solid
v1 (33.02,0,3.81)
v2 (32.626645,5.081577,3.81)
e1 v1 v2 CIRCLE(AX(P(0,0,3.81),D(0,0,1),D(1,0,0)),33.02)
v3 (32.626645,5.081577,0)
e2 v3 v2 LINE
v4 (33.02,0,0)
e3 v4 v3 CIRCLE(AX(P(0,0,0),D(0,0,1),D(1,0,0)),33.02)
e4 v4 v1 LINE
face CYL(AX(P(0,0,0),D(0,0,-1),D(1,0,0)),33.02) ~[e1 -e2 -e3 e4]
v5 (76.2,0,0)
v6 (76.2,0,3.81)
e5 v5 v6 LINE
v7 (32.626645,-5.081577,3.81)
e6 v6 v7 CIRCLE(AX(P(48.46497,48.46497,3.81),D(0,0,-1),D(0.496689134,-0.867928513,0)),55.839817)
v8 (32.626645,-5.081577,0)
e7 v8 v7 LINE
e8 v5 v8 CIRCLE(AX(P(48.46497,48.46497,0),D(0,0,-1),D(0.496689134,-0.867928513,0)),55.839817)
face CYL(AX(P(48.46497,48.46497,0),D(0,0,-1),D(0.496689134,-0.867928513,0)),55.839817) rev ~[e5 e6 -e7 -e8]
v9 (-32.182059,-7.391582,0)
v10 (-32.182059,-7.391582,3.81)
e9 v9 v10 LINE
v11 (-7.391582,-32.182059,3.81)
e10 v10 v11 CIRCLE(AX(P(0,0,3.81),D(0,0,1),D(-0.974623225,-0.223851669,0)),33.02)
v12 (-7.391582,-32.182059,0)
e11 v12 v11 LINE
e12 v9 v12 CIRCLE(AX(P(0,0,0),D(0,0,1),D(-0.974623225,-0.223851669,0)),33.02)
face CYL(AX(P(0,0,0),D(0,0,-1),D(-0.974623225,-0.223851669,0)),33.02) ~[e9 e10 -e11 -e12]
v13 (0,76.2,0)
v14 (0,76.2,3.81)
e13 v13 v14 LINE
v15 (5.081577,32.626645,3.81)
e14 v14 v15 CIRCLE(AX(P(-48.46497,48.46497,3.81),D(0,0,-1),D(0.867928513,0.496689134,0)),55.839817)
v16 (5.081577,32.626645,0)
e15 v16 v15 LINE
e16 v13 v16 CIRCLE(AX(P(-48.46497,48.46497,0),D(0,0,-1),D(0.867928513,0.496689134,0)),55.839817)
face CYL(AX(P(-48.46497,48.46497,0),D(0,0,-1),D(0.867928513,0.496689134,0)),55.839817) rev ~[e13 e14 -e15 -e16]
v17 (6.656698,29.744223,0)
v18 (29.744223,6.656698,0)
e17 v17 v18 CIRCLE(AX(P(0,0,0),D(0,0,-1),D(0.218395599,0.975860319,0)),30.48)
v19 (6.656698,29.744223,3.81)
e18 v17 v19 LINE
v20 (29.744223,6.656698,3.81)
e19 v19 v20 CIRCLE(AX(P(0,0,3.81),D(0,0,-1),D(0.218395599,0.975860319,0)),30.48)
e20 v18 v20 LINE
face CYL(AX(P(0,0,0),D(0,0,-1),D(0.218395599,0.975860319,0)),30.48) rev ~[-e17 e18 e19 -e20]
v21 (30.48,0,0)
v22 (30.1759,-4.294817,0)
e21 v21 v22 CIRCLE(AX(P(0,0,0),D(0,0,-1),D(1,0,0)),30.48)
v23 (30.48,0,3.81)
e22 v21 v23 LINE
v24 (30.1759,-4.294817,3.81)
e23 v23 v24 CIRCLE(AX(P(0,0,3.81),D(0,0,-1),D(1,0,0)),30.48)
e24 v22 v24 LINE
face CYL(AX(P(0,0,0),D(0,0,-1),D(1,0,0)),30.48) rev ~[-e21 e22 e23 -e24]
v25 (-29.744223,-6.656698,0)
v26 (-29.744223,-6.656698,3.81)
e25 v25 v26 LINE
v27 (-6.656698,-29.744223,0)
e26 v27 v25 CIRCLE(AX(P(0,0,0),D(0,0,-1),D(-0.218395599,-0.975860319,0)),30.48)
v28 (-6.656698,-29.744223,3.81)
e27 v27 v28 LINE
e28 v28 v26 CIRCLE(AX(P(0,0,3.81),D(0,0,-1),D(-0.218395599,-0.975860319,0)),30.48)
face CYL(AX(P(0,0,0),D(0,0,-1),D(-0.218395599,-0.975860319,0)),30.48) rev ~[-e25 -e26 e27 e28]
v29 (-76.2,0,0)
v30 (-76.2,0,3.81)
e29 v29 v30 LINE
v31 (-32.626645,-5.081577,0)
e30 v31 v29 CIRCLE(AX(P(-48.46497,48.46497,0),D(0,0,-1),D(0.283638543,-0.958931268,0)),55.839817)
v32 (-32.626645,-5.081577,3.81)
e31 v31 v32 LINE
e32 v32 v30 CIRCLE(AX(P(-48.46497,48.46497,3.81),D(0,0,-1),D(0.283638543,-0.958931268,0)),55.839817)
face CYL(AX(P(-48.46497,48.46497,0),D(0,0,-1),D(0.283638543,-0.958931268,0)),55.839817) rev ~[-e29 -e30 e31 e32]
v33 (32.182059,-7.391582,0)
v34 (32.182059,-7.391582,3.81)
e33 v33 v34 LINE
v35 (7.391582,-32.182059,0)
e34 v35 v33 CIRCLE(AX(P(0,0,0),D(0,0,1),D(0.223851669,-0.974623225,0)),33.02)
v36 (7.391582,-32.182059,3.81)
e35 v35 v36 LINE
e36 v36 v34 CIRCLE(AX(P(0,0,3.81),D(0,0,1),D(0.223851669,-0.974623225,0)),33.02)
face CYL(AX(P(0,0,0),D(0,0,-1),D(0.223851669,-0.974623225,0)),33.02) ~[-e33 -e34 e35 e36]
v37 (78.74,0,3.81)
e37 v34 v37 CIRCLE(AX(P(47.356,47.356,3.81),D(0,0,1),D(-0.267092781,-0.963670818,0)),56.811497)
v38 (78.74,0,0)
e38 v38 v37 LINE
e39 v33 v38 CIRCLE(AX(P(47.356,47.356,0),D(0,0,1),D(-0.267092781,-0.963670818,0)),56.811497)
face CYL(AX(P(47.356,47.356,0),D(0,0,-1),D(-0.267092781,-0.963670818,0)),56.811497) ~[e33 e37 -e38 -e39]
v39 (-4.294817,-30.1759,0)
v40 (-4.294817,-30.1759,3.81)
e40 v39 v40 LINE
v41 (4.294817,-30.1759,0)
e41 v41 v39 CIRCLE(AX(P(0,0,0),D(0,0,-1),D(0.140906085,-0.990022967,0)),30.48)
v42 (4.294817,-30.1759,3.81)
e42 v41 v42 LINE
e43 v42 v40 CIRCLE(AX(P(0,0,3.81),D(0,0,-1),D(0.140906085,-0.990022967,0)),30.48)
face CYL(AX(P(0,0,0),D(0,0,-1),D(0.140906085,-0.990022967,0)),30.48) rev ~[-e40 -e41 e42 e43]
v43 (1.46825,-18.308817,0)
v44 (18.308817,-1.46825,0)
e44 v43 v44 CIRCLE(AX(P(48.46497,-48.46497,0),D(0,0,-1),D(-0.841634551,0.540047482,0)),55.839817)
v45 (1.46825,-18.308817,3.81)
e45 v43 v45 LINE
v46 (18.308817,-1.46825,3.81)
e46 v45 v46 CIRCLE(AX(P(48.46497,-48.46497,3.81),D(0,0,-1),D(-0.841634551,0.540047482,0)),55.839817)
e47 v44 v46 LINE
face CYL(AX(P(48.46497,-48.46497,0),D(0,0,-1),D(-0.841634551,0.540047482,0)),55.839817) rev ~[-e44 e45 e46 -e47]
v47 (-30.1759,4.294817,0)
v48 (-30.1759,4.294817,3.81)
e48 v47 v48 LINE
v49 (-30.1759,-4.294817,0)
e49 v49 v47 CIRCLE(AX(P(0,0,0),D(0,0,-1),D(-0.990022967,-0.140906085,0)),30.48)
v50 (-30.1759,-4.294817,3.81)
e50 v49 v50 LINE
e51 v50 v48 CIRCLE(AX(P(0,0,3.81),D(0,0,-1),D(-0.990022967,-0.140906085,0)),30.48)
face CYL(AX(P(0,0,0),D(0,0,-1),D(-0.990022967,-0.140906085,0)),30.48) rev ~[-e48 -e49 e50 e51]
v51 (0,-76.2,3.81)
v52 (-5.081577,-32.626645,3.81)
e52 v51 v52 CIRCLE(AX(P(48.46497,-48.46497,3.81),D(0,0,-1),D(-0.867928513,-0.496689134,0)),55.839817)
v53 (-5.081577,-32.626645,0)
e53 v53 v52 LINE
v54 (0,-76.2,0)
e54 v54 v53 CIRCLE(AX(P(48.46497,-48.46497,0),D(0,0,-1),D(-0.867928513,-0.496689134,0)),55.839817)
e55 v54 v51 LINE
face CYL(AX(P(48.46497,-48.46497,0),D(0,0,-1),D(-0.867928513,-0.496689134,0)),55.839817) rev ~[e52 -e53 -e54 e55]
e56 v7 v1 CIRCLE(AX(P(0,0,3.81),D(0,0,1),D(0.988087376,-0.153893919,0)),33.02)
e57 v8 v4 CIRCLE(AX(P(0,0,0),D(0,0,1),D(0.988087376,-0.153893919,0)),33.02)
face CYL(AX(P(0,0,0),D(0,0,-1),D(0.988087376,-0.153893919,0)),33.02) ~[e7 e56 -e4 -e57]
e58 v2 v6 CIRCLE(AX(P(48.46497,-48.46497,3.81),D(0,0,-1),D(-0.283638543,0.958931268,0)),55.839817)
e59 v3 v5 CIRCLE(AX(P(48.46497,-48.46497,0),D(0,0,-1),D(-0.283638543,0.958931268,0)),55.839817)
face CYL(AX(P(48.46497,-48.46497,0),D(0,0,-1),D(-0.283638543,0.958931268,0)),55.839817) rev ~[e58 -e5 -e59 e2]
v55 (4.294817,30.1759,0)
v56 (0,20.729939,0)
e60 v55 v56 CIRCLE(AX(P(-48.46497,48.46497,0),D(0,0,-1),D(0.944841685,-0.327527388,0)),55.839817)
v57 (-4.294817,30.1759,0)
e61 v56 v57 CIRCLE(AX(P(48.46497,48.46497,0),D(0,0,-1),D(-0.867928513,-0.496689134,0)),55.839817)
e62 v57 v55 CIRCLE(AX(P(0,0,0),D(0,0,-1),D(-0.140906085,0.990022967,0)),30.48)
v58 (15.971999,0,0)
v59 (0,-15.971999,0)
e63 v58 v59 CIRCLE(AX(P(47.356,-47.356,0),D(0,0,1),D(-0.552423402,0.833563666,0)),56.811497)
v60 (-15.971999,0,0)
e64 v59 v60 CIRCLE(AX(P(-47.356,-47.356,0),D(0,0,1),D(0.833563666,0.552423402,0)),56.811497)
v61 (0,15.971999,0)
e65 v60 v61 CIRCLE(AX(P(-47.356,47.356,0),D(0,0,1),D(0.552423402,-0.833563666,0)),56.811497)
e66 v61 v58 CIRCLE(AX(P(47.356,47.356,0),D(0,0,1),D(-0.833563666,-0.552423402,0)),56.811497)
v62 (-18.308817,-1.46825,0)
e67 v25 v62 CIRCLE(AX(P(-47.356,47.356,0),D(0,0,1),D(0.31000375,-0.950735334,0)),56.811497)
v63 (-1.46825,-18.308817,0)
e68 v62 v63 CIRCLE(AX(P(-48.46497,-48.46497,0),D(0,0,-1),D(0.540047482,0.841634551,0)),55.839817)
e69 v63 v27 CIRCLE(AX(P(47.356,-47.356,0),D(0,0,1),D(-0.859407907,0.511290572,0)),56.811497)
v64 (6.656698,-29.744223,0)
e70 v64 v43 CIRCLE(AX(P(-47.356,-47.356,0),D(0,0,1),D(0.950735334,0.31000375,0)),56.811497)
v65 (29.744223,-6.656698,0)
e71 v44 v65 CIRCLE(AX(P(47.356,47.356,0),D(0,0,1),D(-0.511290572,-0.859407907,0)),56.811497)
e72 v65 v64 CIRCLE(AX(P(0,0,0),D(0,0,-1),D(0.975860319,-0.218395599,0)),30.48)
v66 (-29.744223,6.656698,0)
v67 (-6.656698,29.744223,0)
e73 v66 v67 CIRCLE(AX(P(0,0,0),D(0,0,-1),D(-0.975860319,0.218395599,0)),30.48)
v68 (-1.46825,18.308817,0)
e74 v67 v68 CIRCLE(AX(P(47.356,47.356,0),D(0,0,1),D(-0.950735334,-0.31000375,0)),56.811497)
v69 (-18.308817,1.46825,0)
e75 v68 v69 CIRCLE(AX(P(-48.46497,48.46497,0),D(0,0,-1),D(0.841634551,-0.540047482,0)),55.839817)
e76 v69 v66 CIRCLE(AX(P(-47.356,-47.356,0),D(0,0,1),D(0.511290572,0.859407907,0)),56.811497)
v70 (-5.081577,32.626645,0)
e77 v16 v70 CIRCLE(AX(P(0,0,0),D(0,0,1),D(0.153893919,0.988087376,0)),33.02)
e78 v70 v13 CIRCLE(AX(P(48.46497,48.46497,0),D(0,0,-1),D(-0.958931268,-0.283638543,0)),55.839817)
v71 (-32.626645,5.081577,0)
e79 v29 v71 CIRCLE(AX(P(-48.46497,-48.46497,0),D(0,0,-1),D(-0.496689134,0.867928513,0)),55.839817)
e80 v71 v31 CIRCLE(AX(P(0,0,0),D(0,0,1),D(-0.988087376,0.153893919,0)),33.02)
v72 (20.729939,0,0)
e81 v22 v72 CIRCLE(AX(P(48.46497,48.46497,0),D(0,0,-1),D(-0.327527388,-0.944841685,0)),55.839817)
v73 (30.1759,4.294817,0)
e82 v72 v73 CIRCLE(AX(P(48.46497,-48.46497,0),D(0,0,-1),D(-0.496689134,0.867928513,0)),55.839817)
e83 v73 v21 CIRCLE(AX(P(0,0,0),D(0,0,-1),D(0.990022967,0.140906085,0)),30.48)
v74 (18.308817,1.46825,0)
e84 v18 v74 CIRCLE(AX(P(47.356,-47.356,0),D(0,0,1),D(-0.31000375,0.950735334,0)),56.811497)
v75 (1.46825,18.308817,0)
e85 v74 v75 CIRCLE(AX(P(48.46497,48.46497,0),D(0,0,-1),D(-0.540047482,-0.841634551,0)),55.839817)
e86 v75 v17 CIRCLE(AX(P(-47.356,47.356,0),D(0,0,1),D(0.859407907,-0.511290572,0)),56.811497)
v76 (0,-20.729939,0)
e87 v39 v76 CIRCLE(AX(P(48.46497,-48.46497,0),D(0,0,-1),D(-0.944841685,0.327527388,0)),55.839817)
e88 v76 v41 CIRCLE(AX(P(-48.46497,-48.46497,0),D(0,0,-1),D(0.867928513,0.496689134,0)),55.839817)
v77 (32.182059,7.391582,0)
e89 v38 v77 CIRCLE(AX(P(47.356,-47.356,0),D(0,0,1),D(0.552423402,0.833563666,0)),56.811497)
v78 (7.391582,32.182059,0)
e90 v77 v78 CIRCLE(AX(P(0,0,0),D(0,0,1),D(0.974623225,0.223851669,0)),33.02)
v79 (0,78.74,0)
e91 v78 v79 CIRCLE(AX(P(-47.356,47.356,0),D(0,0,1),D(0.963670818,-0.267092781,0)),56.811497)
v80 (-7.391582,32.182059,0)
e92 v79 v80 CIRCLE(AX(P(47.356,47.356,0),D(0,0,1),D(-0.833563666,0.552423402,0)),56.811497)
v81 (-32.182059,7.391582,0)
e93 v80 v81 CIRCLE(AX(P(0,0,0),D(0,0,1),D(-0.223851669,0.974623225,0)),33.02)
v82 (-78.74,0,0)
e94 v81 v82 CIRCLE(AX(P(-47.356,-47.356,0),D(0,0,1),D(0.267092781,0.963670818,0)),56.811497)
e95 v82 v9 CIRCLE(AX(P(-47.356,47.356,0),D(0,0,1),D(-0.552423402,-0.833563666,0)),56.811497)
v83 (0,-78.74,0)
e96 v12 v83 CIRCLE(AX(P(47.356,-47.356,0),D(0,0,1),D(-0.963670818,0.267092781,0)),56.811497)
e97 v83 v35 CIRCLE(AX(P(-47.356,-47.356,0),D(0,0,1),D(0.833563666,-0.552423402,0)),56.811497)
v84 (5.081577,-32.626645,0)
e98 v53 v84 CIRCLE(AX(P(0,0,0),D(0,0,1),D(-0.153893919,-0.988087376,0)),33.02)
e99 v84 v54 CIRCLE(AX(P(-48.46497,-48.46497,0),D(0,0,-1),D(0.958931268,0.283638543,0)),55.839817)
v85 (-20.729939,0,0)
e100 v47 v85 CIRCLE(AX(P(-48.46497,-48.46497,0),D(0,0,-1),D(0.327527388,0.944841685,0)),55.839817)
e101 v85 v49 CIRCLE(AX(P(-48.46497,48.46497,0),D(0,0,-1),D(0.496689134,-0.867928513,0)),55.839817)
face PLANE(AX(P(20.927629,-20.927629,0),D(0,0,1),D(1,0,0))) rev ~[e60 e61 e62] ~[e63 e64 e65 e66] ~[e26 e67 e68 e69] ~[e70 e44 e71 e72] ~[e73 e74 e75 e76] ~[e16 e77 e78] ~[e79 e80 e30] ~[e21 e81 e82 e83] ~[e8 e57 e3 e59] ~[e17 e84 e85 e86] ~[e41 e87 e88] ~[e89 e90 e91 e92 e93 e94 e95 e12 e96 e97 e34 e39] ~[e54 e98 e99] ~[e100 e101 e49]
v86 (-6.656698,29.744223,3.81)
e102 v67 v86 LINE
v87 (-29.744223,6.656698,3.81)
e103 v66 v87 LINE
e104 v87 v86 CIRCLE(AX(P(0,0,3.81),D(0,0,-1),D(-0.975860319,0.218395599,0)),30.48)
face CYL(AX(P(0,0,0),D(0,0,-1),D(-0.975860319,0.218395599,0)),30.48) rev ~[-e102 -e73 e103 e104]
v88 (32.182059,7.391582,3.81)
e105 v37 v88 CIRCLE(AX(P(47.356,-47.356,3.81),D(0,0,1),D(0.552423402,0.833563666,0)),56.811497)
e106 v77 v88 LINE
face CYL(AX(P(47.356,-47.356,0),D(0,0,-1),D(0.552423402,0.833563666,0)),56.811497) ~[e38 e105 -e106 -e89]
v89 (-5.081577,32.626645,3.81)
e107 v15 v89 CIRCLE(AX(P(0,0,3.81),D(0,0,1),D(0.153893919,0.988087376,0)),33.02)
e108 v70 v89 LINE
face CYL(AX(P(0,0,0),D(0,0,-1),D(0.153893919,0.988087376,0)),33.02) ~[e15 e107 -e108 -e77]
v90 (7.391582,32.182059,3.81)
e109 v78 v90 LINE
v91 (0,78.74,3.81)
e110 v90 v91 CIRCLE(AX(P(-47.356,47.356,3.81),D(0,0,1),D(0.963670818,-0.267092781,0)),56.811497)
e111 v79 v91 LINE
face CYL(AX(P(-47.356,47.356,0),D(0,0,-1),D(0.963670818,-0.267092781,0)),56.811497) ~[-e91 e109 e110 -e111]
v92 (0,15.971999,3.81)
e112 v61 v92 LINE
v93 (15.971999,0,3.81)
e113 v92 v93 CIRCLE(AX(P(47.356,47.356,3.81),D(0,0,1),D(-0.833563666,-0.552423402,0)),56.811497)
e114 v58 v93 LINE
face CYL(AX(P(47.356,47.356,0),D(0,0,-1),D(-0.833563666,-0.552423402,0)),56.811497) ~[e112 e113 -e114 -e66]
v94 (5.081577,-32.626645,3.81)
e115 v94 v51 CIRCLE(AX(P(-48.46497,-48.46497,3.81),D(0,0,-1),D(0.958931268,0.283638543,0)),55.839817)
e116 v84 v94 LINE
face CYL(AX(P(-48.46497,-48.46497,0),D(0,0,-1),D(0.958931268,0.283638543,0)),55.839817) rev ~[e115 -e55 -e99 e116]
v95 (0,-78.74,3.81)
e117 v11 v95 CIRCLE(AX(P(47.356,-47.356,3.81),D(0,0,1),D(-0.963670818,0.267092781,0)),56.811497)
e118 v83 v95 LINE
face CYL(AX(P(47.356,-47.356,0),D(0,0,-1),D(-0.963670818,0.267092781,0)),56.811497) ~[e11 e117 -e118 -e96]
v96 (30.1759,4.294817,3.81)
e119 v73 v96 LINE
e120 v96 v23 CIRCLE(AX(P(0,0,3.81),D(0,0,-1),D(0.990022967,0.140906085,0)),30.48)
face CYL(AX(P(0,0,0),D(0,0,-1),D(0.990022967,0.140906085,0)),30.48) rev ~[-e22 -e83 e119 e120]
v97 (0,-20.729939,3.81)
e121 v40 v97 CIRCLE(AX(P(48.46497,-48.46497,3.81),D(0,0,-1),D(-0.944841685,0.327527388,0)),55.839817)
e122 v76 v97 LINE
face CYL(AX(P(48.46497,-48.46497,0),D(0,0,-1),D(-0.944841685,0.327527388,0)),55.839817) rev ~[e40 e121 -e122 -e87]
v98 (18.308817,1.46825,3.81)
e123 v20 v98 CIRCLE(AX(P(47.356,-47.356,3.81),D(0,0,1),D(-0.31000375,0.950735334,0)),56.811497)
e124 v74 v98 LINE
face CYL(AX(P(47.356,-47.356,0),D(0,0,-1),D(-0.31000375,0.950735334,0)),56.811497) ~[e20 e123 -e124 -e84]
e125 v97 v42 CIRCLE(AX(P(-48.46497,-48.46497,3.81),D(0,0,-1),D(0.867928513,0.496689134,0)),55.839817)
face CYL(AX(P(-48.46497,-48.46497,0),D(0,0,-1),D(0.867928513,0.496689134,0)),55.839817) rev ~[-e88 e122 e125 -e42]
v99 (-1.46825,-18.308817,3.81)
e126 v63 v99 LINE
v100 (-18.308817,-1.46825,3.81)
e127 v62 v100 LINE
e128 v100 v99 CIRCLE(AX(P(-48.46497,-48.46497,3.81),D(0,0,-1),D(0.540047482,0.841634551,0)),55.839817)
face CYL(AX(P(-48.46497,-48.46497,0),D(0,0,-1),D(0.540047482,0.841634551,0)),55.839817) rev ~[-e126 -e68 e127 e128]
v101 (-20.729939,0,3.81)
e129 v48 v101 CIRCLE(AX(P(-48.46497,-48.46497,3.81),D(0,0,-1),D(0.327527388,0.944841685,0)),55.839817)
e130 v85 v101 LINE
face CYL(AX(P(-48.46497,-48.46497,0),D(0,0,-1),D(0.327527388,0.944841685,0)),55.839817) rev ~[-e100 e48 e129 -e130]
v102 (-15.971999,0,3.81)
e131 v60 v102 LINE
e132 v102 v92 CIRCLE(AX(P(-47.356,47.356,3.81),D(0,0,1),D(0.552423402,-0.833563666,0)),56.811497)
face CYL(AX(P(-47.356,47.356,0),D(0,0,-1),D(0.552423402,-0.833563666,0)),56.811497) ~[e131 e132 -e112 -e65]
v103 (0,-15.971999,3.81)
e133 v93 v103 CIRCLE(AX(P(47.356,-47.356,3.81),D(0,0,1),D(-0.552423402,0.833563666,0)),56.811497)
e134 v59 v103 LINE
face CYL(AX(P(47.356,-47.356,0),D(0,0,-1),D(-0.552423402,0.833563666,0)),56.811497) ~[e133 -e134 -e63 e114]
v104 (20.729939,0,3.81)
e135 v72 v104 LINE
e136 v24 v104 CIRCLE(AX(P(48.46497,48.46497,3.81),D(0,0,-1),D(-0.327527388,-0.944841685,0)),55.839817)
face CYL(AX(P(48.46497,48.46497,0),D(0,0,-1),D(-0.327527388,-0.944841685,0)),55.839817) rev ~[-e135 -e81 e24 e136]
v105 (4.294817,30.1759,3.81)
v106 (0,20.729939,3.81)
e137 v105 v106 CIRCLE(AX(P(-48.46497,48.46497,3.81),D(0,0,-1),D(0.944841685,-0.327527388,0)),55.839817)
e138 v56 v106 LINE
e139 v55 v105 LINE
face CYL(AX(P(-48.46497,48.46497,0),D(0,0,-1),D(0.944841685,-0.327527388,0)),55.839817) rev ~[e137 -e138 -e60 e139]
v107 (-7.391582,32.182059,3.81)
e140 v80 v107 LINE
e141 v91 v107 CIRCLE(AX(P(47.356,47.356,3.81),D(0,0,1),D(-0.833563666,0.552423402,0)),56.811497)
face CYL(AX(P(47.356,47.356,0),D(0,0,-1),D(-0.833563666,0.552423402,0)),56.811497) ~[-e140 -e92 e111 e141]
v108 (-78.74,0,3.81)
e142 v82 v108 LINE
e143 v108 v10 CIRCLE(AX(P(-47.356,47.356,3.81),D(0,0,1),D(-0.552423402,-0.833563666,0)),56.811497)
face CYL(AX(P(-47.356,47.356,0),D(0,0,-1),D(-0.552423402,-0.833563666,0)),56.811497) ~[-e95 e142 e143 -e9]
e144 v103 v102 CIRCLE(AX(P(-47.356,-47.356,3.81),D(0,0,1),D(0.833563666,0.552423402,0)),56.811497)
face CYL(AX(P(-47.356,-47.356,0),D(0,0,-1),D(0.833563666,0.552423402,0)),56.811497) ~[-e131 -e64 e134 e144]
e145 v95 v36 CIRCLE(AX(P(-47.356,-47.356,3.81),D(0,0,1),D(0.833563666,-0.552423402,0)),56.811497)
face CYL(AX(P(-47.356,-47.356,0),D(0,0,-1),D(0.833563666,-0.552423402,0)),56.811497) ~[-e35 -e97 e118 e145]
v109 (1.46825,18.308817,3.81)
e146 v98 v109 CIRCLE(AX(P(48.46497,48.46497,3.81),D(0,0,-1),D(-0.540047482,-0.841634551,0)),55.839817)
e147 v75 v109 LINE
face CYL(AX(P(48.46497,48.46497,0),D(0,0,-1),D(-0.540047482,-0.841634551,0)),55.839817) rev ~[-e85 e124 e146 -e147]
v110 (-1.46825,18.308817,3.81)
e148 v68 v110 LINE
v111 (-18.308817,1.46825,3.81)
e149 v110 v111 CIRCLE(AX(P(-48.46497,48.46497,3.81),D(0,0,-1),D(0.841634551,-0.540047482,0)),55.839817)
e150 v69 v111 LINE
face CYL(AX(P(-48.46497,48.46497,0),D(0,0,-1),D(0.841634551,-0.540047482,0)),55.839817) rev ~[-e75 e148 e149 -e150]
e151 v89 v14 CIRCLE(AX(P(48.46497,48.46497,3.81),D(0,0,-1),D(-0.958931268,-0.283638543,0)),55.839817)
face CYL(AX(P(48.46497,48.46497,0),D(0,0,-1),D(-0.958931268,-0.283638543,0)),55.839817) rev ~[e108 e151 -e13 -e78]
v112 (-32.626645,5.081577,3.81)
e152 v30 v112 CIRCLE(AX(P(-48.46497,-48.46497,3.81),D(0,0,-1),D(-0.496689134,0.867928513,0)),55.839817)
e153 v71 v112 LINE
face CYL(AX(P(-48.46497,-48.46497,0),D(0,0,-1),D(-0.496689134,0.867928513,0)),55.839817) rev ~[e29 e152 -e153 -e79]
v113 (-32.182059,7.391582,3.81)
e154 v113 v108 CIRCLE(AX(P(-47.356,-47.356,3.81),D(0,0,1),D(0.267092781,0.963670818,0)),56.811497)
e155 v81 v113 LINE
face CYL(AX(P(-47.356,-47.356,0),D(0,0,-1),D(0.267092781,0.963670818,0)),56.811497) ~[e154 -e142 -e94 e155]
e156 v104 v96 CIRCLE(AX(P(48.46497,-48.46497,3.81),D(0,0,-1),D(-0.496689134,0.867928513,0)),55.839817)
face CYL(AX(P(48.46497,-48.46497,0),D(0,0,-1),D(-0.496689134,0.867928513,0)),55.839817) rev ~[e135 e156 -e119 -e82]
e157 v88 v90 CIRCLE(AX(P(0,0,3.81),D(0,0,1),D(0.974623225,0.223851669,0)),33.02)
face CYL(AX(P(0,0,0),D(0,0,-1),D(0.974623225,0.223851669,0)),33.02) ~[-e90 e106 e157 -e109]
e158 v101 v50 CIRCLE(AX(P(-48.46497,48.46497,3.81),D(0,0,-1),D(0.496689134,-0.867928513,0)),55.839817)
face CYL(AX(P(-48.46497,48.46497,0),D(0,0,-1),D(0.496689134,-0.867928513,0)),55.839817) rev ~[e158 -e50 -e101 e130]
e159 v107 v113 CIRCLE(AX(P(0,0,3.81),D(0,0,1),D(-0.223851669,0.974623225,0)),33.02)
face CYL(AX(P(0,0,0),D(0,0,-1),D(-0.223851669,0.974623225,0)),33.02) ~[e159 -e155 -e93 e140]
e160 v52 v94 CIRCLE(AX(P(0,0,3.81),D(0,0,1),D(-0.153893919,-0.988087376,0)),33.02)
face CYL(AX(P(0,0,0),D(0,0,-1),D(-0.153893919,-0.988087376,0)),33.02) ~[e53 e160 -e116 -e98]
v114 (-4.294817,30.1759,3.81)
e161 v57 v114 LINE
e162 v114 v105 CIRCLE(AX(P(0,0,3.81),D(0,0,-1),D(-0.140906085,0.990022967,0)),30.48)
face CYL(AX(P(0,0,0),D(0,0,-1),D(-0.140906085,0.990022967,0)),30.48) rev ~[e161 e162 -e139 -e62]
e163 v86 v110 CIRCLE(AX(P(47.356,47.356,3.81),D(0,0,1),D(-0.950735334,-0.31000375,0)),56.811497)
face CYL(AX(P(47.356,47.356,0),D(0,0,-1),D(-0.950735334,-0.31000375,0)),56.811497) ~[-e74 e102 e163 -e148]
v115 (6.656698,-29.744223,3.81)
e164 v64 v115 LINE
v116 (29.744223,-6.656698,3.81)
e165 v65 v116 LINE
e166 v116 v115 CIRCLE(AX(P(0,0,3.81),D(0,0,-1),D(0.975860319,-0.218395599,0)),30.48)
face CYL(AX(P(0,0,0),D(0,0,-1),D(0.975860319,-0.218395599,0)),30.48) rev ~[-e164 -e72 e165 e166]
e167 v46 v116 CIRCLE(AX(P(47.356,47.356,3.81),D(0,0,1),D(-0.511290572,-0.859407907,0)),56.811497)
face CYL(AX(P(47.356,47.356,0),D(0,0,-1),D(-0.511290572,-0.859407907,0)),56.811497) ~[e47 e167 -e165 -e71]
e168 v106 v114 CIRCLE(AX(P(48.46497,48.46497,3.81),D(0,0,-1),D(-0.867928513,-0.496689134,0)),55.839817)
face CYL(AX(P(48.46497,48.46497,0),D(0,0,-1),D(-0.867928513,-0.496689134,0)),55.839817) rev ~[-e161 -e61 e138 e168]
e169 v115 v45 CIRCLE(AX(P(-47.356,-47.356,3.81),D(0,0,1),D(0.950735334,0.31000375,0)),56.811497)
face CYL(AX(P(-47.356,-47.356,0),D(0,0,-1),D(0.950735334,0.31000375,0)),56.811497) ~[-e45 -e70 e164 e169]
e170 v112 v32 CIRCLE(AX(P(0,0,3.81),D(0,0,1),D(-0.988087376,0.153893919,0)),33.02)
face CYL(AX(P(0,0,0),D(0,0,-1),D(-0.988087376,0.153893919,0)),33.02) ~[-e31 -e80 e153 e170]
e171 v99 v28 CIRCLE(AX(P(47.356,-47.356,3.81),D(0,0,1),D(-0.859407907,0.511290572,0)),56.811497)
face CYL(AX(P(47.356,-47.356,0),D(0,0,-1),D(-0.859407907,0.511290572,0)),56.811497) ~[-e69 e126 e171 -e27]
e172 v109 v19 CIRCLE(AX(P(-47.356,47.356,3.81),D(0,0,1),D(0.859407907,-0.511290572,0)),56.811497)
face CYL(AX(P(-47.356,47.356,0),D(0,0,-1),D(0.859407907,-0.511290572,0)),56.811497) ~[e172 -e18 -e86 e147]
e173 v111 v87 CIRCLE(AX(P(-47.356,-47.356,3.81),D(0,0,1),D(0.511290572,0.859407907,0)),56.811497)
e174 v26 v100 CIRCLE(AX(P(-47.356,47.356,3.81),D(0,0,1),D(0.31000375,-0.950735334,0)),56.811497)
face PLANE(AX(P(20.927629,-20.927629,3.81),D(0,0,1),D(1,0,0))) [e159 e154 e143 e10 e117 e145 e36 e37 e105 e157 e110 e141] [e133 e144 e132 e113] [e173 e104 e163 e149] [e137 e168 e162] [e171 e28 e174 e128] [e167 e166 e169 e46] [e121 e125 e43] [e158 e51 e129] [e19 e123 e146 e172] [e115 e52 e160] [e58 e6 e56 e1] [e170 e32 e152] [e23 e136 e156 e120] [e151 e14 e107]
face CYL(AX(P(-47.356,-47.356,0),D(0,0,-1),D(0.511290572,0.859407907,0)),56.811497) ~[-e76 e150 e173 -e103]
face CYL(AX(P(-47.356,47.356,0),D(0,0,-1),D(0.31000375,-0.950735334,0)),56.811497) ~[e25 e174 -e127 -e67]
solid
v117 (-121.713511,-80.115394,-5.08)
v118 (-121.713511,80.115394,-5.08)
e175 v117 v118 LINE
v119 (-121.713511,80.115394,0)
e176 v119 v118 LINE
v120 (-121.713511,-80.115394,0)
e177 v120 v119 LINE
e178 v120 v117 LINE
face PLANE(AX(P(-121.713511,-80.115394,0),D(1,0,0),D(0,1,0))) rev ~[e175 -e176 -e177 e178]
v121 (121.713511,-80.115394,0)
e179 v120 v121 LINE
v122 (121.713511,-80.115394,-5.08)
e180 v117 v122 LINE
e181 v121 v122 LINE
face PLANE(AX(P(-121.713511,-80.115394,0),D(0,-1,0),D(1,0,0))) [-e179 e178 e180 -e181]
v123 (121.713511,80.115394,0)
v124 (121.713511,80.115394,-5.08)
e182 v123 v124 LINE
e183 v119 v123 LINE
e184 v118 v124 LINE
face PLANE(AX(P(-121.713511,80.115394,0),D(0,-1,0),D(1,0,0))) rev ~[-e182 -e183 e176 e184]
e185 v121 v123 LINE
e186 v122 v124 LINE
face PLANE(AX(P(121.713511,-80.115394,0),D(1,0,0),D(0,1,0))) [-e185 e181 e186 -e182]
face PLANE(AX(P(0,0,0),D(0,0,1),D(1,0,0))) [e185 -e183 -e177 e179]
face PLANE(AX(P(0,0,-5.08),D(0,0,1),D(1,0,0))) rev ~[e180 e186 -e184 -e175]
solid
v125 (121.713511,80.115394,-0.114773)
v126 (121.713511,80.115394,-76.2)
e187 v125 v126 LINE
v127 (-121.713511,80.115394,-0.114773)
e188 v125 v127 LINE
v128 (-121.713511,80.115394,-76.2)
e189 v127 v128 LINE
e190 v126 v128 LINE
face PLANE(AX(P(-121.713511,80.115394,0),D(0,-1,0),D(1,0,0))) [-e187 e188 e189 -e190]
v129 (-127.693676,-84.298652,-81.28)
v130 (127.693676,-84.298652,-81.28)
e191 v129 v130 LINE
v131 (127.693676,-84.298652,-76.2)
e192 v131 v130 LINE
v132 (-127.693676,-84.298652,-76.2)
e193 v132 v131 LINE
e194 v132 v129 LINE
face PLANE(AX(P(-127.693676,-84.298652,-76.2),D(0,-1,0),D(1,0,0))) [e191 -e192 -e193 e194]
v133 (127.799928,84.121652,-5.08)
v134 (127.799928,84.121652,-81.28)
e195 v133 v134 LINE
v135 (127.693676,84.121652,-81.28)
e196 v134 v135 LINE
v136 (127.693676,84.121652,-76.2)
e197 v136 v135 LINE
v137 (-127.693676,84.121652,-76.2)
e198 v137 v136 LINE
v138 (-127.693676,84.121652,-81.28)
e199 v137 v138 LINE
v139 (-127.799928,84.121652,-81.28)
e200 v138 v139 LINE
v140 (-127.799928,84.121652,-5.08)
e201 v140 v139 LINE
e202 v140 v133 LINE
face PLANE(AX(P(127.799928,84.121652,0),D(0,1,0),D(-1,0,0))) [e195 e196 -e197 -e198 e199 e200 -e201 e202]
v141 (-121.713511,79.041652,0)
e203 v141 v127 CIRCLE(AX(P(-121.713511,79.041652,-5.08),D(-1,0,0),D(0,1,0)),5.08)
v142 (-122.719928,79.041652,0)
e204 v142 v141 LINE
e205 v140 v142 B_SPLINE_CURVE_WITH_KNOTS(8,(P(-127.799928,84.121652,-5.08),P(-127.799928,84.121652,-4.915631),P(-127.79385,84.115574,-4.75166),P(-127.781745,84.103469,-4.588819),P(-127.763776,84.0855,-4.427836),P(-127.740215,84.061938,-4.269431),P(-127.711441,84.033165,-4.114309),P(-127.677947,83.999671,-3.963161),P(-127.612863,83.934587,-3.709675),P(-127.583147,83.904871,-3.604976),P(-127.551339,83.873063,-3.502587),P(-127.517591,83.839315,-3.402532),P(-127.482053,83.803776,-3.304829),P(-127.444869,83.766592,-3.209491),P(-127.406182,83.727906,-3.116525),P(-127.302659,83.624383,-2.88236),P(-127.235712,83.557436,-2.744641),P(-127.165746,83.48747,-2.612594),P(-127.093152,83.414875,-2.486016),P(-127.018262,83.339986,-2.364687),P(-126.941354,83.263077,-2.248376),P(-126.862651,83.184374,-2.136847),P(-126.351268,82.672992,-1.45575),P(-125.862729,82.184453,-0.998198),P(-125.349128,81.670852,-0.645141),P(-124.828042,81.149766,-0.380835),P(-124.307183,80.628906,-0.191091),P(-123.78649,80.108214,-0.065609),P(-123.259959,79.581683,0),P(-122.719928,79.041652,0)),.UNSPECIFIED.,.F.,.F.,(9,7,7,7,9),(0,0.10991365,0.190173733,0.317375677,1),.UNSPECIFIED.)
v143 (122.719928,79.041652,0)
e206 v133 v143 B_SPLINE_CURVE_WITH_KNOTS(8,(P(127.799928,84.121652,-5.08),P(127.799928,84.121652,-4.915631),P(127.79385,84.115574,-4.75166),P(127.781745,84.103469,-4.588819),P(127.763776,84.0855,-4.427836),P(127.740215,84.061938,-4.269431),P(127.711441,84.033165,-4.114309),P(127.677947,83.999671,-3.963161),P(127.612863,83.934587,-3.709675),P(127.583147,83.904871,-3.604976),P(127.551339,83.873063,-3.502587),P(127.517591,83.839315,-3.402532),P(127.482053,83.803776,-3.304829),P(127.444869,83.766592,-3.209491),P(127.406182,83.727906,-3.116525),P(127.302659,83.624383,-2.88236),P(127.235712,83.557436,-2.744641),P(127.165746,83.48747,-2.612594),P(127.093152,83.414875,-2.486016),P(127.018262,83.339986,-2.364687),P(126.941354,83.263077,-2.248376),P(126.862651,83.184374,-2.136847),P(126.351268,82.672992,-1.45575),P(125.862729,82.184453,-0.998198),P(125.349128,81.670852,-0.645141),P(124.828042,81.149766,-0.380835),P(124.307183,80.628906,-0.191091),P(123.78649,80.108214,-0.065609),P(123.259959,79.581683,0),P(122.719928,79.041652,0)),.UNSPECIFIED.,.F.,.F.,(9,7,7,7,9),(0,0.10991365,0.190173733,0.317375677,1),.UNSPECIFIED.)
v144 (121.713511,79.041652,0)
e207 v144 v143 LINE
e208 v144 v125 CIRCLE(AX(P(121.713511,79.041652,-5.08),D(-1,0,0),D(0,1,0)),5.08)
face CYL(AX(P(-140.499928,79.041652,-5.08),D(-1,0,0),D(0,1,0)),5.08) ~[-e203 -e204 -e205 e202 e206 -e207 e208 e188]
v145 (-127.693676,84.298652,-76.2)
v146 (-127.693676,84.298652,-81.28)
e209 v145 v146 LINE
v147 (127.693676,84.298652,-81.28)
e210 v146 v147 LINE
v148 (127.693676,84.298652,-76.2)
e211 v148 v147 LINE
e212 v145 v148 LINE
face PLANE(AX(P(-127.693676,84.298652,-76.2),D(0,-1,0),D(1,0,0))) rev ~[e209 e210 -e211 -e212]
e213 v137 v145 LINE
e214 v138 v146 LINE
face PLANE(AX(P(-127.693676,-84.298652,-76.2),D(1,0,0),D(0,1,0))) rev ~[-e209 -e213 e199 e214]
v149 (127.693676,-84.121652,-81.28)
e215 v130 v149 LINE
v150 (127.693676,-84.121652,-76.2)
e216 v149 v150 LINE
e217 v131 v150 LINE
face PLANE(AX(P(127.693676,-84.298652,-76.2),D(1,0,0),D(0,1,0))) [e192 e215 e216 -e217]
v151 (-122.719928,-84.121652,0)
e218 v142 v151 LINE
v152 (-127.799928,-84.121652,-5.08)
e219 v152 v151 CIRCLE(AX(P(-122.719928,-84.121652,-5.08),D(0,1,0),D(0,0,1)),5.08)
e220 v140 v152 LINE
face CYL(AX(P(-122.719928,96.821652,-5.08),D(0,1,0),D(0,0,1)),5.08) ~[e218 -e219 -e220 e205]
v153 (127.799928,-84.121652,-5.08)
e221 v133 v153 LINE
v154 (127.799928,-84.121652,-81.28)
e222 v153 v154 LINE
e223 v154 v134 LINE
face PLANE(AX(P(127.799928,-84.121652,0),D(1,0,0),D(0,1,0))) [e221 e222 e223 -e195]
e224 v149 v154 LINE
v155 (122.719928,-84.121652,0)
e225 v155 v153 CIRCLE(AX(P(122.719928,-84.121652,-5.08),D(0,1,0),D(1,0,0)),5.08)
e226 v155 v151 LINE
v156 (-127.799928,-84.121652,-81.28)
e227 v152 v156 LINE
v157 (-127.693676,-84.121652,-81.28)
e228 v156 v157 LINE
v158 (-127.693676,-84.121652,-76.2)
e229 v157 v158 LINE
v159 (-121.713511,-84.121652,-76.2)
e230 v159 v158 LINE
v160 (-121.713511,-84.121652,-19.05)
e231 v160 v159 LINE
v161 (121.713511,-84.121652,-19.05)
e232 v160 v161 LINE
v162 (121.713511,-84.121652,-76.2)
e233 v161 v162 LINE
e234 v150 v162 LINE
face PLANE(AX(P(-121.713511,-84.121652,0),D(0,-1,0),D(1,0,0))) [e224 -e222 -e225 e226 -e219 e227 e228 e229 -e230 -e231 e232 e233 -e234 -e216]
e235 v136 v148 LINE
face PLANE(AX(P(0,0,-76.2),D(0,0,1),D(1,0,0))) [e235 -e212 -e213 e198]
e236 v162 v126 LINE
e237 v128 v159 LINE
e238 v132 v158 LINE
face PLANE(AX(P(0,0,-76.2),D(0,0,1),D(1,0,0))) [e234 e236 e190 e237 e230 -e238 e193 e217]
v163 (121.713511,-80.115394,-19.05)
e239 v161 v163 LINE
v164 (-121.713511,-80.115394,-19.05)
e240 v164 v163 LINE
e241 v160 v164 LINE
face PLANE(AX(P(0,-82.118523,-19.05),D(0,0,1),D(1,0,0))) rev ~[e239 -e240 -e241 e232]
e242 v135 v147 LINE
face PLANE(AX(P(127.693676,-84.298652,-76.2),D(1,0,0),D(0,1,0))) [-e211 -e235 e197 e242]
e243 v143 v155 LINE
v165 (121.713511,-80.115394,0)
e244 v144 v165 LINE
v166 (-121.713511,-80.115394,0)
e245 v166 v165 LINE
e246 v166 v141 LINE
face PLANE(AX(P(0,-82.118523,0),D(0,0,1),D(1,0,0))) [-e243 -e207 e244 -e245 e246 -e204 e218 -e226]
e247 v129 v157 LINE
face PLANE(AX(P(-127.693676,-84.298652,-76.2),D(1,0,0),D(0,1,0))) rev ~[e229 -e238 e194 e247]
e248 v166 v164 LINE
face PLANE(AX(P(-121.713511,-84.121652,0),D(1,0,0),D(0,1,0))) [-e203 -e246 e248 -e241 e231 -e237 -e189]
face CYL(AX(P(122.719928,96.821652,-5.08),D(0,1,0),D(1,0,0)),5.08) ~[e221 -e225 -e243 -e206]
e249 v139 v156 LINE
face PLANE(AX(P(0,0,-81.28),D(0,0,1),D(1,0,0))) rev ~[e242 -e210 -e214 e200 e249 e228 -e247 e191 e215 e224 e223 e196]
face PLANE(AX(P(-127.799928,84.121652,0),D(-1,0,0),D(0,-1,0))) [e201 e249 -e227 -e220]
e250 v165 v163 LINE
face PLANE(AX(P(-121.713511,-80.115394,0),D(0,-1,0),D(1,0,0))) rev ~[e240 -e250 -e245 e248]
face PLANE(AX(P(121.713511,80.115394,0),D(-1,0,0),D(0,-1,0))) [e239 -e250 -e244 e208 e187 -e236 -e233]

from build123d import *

# Parameters (mm, degrees)
F1_DEPTH    = 3.81
F8_DEPTH    = 81.28
F2_W        = 243.4270217588
F2_H        = 4.0062579512
F5_DEPTH    = 19.05
F2_H_2      = 160.2307879926
F6_DEPTH    = 5.08
F4_W        = 255.387352037
F4_H        = 168.597304807
F9_DEPTH    = 5.08
F7_T1_DEPTH = 193.643303895
F7_T3_DEPTH = 280.9998563766


# Not quite as in the source:
# - a fillet or chamfer that OpenCascade refuses, or shapes differently, is made with other operations: its cross-section is extruded or revolved along the edge and cut away or added


with BuildPart() as f1:
    # F0 (on Top) → F1 (new body)
    with BuildSketch(Plane.XY):
        with BuildLine():
            ThreePointArc((7.3915821042, -32.1820588837), (23.3486659148, -23.3486659148), (32.1820588837, -7.3915821042))
            ThreePointArc((32.1820588837, -7.3915821042), (30.9590231559, -7.0377991533), (29.7442225234, -6.6566978658))
            ThreePointArc((29.7442225234, -6.6566978658), (21.5526146906, -21.5526146906), (6.6566978658, -29.7442225234))
            ThreePointArc((6.6566978658, -29.7442225234), (7.0377991533, -30.9590231559), (7.3915821042, -32.1820588837))
        make_face()
        with BuildLine():
            ThreePointArc((29.7442225234, -6.6566978658), (30.9590231559, -7.0377991533), (32.1820588837, -7.3915821042))
            ThreePointArc((32.1820588837, -7.3915821042), (32.4249296069, -6.2405400398), (32.6266451411, -5.0815771994))
            ThreePointArc((32.6266451411, -5.0815771994), (31.3967387773, -4.7023200855), (30.1759000362, -4.294817459))
            ThreePointArc((30.1759000362, -4.294817459), (29.9833268944, -5.4800098856), (29.7442225234, -6.6566978658))
        make_face()
        with BuildLine():
            ThreePointArc((33.02, 0), (32.9215144135, 2.5483894364), (32.6266451411, 5.0815771994))
            ThreePointArc((32.6266451411, 5.0815771994), (31.3967387773, 4.7023200855), (30.1759000362, 4.294817459))
            ThreePointArc((30.1759000362, 4.294817459), (30.4038799588, 2.1527850447), (30.48, 0))
            ThreePointArc((30.48, 0), (30.4038799588, -2.1527850447), (30.1759000362, -4.294817459))
            ThreePointArc((30.1759000362, -4.294817459), (31.3967387773, -4.7023200855), (32.6266451411, -5.0815771994))
            ThreePointArc((32.6266451411, -5.0815771994), (32.9215144135, -2.5483894364), (33.02, 0))
        make_face()
        with BuildLine():
            ThreePointArc((78.74, 0), (56.263882639, 8.7527857998), (32.1820588837, 7.3915821042))
            ThreePointArc((32.1820588837, 7.3915821042), (32.4249296069, 6.2405400398), (32.6266451411, 5.0815771994))
            ThreePointArc((32.6266451411, 5.0815771994), (54.9332390521, 6.9989527596), (76.2, 0))
            ThreePointArc((76.2, 0), (54.9332390521, -6.9989527596), (32.6266451411, -5.0815771994))
            ThreePointArc((32.6266451411, -5.0815771994), (32.4249296069, -6.2405400398), (32.1820588837, -7.3915821042))
            ThreePointArc((32.1820588837, -7.3915821042), (56.263882639, -8.7527857998), (78.74, 0))
        make_face()
        with BuildLine():
            ThreePointArc((30.1759000362, -4.294817459), (25.3529421779, -2.367297562), (20.7299390728, 0))
            ThreePointArc((20.7299390728, 0), (19.5100699332, -0.7187762227), (18.3088168551, -1.4682500504))
            ThreePointArc((18.3088168551, -1.4682500504), (23.882724784, -4.3793997775), (29.7442225234, -6.6566978658))
            ThreePointArc((29.7442225234, -6.6566978658), (29.9833268944, -5.4800098856), (30.1759000362, -4.294817459))
        make_face()
        with BuildLine():
            ThreePointArc((30.1759000362, 4.294817459), (29.9833268944, 5.4800098856), (29.7442225234, 6.6566978658))
            ThreePointArc((29.7442225234, 6.6566978658), (23.882724784, 4.3793997775), (18.3088168551, 1.4682500504))
            ThreePointArc((18.3088168551, 1.4682500504), (19.5100699332, 0.7187762227), (20.7299390728, 0))
            ThreePointArc((20.7299390728, 0), (25.3529421779, 2.367297562), (30.1759000362, 4.294817459))
        make_face()
        with BuildLine():
            ThreePointArc((32.1820588837, 7.3915821042), (23.3486659148, 23.3486659148), (7.3915821042, 32.1820588837))
            ThreePointArc((7.3915821042, 32.1820588837), (7.0377991533, 30.9590231559), (6.6566978658, 29.7442225234))
            ThreePointArc((6.6566978658, 29.7442225234), (21.5526146906, 21.5526146906), (29.7442225234, 6.6566978658))
            ThreePointArc((29.7442225234, 6.6566978658), (30.9590231559, 7.0377991533), (32.1820588837, 7.3915821042))
        make_face()
        with BuildLine():
            ThreePointArc((32.6266451411, 5.0815771994), (32.4249296069, 6.2405400398), (32.1820588837, 7.3915821042))
            ThreePointArc((32.1820588837, 7.3915821042), (30.9590231559, 7.0377991533), (29.7442225234, 6.6566978658))
            ThreePointArc((29.7442225234, 6.6566978658), (29.9833268944, 5.4800098856), (30.1759000362, 4.294817459))
            ThreePointArc((30.1759000362, 4.294817459), (31.3967387773, 4.7023200855), (32.6266451411, 5.0815771994))
        make_face()
        with BuildLine():
            ThreePointArc((4.294817459, -30.1759000362), (5.4800098856, -29.9833268944), (6.6566978658, -29.7442225234))
            ThreePointArc((6.6566978658, -29.7442225234), (4.3793997775, -23.882724784), (1.4682500504, -18.3088168551))
            ThreePointArc((1.4682500504, -18.3088168551), (0.7187762227, -19.5100699332), (0, -20.7299390728))
            ThreePointArc((0, -20.7299390728), (2.367297562, -25.3529421779), (4.294817459, -30.1759000362))
        make_face()
        with BuildLine():
            ThreePointArc((-5.0815771994, -32.6266451411), (-6.2405400398, -32.4249296069), (-7.3915821042, -32.1820588837))
            ThreePointArc((-7.3915821042, -32.1820588837), (-8.7527857998, -56.263882639), (0, -78.74))
            ThreePointArc((0, -78.74), (8.7527857998, -56.263882639), (7.3915821042, -32.1820588837))
            ThreePointArc((7.3915821042, -32.1820588837), (6.2405400398, -32.4249296069), (5.0815771994, -32.6266451411))
            ThreePointArc((5.0815771994, -32.6266451411), (6.9989527596, -54.9332390521), (0, -76.2))
            ThreePointArc((0, -76.2), (-6.9989527596, -54.9332390521), (-5.0815771994, -32.6266451411))
        make_face()
        with BuildLine():
            ThreePointArc((-4.294817459, -30.1759000362), (-4.7023200855, -31.3967387773), (-5.0815771994, -32.6266451411))
            ThreePointArc((-5.0815771994, -32.6266451411), (0, -33.02), (5.0815771994, -32.6266451411))
            ThreePointArc((5.0815771994, -32.6266451411), (4.7023200855, -31.3967387773), (4.294817459, -30.1759000362))
            ThreePointArc((4.294817459, -30.1759000362), (0, -30.48), (-4.294817459, -30.1759000362))
        make_face()
        with BuildLine():
            ThreePointArc((5.0815771994, -32.6266451411), (6.2405400398, -32.4249296069), (7.3915821042, -32.1820588837))
            ThreePointArc((7.3915821042, -32.1820588837), (7.0377991533, -30.9590231559), (6.6566978658, -29.7442225234))
            ThreePointArc((6.6566978658, -29.7442225234), (5.4800098856, -29.9833268944), (4.294817459, -30.1759000362))
            ThreePointArc((4.294817459, -30.1759000362), (4.7023200855, -31.3967387773), (5.0815771994, -32.6266451411))
        make_face()
        with BuildLine():
            ThreePointArc((-6.6566978658, -29.7442225234), (-7.0377991533, -30.9590231559), (-7.3915821042, -32.1820588837))
            ThreePointArc((-7.3915821042, -32.1820588837), (-6.2405400398, -32.4249296069), (-5.0815771994, -32.6266451411))
            ThreePointArc((-5.0815771994, -32.6266451411), (-4.7023200855, -31.3967387773), (-4.294817459, -30.1759000362))
            ThreePointArc((-4.294817459, -30.1759000362), (-5.4800098856, -29.9833268944), (-6.6566978658, -29.7442225234))
        make_face()
        with BuildLine():
            ThreePointArc((-1.4682500504, -18.3088168551), (-4.3793997775, -23.882724784), (-6.6566978658, -29.7442225234))
            ThreePointArc((-6.6566978658, -29.7442225234), (-5.4800098856, -29.9833268944), (-4.294817459, -30.1759000362))
            ThreePointArc((-4.294817459, -30.1759000362), (-2.367297562, -25.3529421779), (0, -20.7299390728))
            ThreePointArc((0, -20.7299390728), (-0.7187762227, -19.5100699332), (-1.4682500504, -18.3088168551))
        make_face()
        with BuildLine():
            ThreePointArc((18.3088168551, -1.4682500504), (17.1314911064, -0.7483168971), (15.9719991981, 0))
            ThreePointArc((15.9719991981, 0), (7.1842048969, -7.1842048969), (0, -15.9719991981))
            ThreePointArc((0, -15.9719991981), (0.7483168971, -17.1314911064), (1.4682500504, -18.3088168551))
            ThreePointArc((1.4682500504, -18.3088168551), (8.9802561211, -8.9802561211), (18.3088168551, -1.4682500504))
        make_face()
        with BuildLine():
            ThreePointArc((18.3088168551, 1.4682500504), (8.9802561211, 8.9802561211), (1.4682500504, 18.3088168551))
            ThreePointArc((1.4682500504, 18.3088168551), (0.7483168971, 17.1314911064), (0, 15.9719991981))
            ThreePointArc((0, 15.9719991981), (7.1842048969, 7.1842048969), (15.9719991981, 0))
            ThreePointArc((15.9719991981, 0), (17.1314911064, 0.7483168971), (18.3088168551, 1.4682500504))
        make_face()
        with BuildLine():
            ThreePointArc((0, 15.9719991981), (-0.7483168971, 17.1314911064), (-1.4682500504, 18.3088168551))
            ThreePointArc((-1.4682500504, 18.3088168551), (-8.9802561211, 8.9802561211), (-18.3088168551, 1.4682500504))
            ThreePointArc((-18.3088168551, 1.4682500504), (-17.1314911064, 0.7483168971), (-15.9719991981, 0))
            ThreePointArc((-15.9719991981, 0), (-7.1842048969, 7.1842048969), (0, 15.9719991981))
        make_face()
        with BuildLine():
            ThreePointArc((0, -15.9719991981), (-7.1842048969, -7.1842048969), (-15.9719991981, 0))
            ThreePointArc((-15.9719991981, 0), (-17.1314911064, -0.7483168971), (-18.3088168551, -1.4682500504))
            ThreePointArc((-18.3088168551, -1.4682500504), (-8.9802561211, -8.9802561211), (-1.4682500504, -18.3088168551))
            ThreePointArc((-1.4682500504, -18.3088168551), (-0.7483168971, -17.1314911064), (0, -15.9719991981))
        make_face()
        with BuildLine():
            ThreePointArc((-18.3088168551, 1.4682500504), (-23.882724784, 4.3793997775), (-29.7442225234, 6.6566978658))
            ThreePointArc((-29.7442225234, 6.6566978658), (-29.9833268944, 5.4800098856), (-30.1759000362, 4.294817459))
            ThreePointArc((-30.1759000362, 4.294817459), (-25.3529421779, 2.367297562), (-20.7299390728, 0))
            ThreePointArc((-20.7299390728, 0), (-19.5100699332, 0.7187762227), (-18.3088168551, 1.4682500504))
        make_face()
        with BuildLine():
            ThreePointArc((-18.3088168551, -1.4682500504), (-19.5100699332, -0.7187762227), (-20.7299390728, 0))
            ThreePointArc((-20.7299390728, 0), (-25.3529421779, -2.367297562), (-30.1759000362, -4.294817459))
            ThreePointArc((-30.1759000362, -4.294817459), (-29.9833268944, -5.4800098856), (-29.7442225234, -6.6566978658))
            ThreePointArc((-29.7442225234, -6.6566978658), (-23.882724784, -4.3793997775), (-18.3088168551, -1.4682500504))
        make_face()
        with BuildLine():
            ThreePointArc((-30.1759000362, 4.294817459), (-31.3967387773, 4.7023200855), (-32.6266451411, 5.0815771994))
            ThreePointArc((-32.6266451411, 5.0815771994), (-33.02, 0), (-32.6266451411, -5.0815771994))
            ThreePointArc((-32.6266451411, -5.0815771994), (-31.3967387773, -4.7023200855), (-30.1759000362, -4.294817459))
            ThreePointArc((-30.1759000362, -4.294817459), (-30.48, 0), (-30.1759000362, 4.294817459))
        make_face()
        with BuildLine():
            ThreePointArc((-32.6266451411, -5.0815771994), (-32.4249296069, -6.2405400398), (-32.1820588837, -7.3915821042))
            ThreePointArc((-32.1820588837, -7.3915821042), (-30.9590231559, -7.0377991533), (-29.7442225234, -6.6566978658))
            ThreePointArc((-29.7442225234, -6.6566978658), (-29.9833268944, -5.4800098856), (-30.1759000362, -4.294817459))
            ThreePointArc((-30.1759000362, -4.294817459), (-31.3967387773, -4.7023200855), (-32.6266451411, -5.0815771994))
        make_face()
        with BuildLine():
            ThreePointArc((-29.7442225234, -6.6566978658), (-30.9590231559, -7.0377991533), (-32.1820588837, -7.3915821042))
            ThreePointArc((-32.1820588837, -7.3915821042), (-23.3486659148, -23.3486659148), (-7.3915821042, -32.1820588837))
            ThreePointArc((-7.3915821042, -32.1820588837), (-7.0377991533, -30.9590231559), (-6.6566978658, -29.7442225234))
            ThreePointArc((-6.6566978658, -29.7442225234), (-21.5526146906, -21.5526146906), (-29.7442225234, -6.6566978658))
        make_face()
        with BuildLine():
            ThreePointArc((-29.7442225234, 6.6566978658), (-30.9590231559, 7.0377991533), (-32.1820588837, 7.3915821042))
            ThreePointArc((-32.1820588837, 7.3915821042), (-32.4249296069, 6.2405400398), (-32.6266451411, 5.0815771994))
            ThreePointArc((-32.6266451411, 5.0815771994), (-31.3967387773, 4.7023200855), (-30.1759000362, 4.294817459))
            ThreePointArc((-30.1759000362, 4.294817459), (-29.9833268944, 5.4800098856), (-29.7442225234, 6.6566978658))
        make_face()
        with BuildLine():
            ThreePointArc((-32.6266451411, 5.0815771994), (-32.4249296069, 6.2405400398), (-32.1820588837, 7.3915821042))
            ThreePointArc((-32.1820588837, 7.3915821042), (-56.263882639, 8.7527857998), (-78.74, 0))
            ThreePointArc((-78.74, 0), (-56.263882639, -8.7527857998), (-32.1820588837, -7.3915821042))
            ThreePointArc((-32.1820588837, -7.3915821042), (-32.4249296069, -6.2405400398), (-32.6266451411, -5.0815771994))
            ThreePointArc((-32.6266451411, -5.0815771994), (-54.9332390521, -6.9989527596), (-76.2, 0))
            ThreePointArc((-76.2, 0), (-54.9332390521, 6.9989527596), (-32.6266451411, 5.0815771994))
        make_face()
        with BuildLine():
            ThreePointArc((-6.6566978658, 29.7442225234), (-7.0377991533, 30.9590231559), (-7.3915821042, 32.1820588837))
            ThreePointArc((-7.3915821042, 32.1820588837), (-23.3486659148, 23.3486659148), (-32.1820588837, 7.3915821042))
            ThreePointArc((-32.1820588837, 7.3915821042), (-30.9590231559, 7.0377991533), (-29.7442225234, 6.6566978658))
            ThreePointArc((-29.7442225234, 6.6566978658), (-21.5526146906, 21.5526146906), (-6.6566978658, 29.7442225234))
        make_face()
        with BuildLine():
            ThreePointArc((0, 20.7299390728), (-2.367297562, 25.3529421779), (-4.294817459, 30.1759000362))
            ThreePointArc((-4.294817459, 30.1759000362), (-5.4800098856, 29.9833268944), (-6.6566978658, 29.7442225234))
            ThreePointArc((-6.6566978658, 29.7442225234), (-4.3793997775, 23.882724784), (-1.4682500504, 18.3088168551))
            ThreePointArc((-1.4682500504, 18.3088168551), (-0.7187762227, 19.5100699332), (0, 20.7299390728))
        make_face()
        with BuildLine():
            ThreePointArc((6.6566978658, 29.7442225234), (5.4800098856, 29.9833268944), (4.294817459, 30.1759000362))
            ThreePointArc((4.294817459, 30.1759000362), (2.367297562, 25.3529421779), (0, 20.7299390728))
            ThreePointArc((0, 20.7299390728), (0.7187762227, 19.5100699332), (1.4682500504, 18.3088168551))
            ThreePointArc((1.4682500504, 18.3088168551), (4.3793997775, 23.882724784), (6.6566978658, 29.7442225234))
        make_face()
        with BuildLine():
            ThreePointArc((5.0815771994, 32.6266451411), (0, 33.02), (-5.0815771994, 32.6266451411))
            ThreePointArc((-5.0815771994, 32.6266451411), (-4.7023200855, 31.3967387773), (-4.294817459, 30.1759000362))
            ThreePointArc((-4.294817459, 30.1759000362), (0, 30.48), (4.294817459, 30.1759000362))
            ThreePointArc((4.294817459, 30.1759000362), (4.7023200855, 31.3967387773), (5.0815771994, 32.6266451411))
        make_face()
        with BuildLine():
            ThreePointArc((-5.0815771994, 32.6266451411), (-6.9989527596, 54.9332390521), (0, 76.2))
            ThreePointArc((0, 76.2), (6.9989527596, 54.9332390521), (5.0815771994, 32.6266451411))
            ThreePointArc((5.0815771994, 32.6266451411), (6.2405400398, 32.4249296069), (7.3915821042, 32.1820588837))
            ThreePointArc((7.3915821042, 32.1820588837), (8.7527857998, 56.263882639), (0, 78.74))
            ThreePointArc((0, 78.74), (-8.7527857998, 56.263882639), (-7.3915821042, 32.1820588837))
            ThreePointArc((-7.3915821042, 32.1820588837), (-6.2405400398, 32.4249296069), (-5.0815771994, 32.6266451411))
        make_face()
        with BuildLine():
            ThreePointArc((7.3915821042, 32.1820588837), (6.2405400398, 32.4249296069), (5.0815771994, 32.6266451411))
            ThreePointArc((5.0815771994, 32.6266451411), (4.7023200855, 31.3967387773), (4.294817459, 30.1759000362))
            ThreePointArc((4.294817459, 30.1759000362), (5.4800098856, 29.9833268944), (6.6566978658, 29.7442225234))
            ThreePointArc((6.6566978658, 29.7442225234), (7.0377991533, 30.9590231559), (7.3915821042, 32.1820588837))
        make_face()
        with BuildLine():
            ThreePointArc((1.4682500504, 18.3088168551), (0.7187762227, 19.5100699332), (0, 20.7299390728))
            ThreePointArc((0, 20.7299390728), (-0.7187762227, 19.5100699332), (-1.4682500504, 18.3088168551))
            ThreePointArc((-1.4682500504, 18.3088168551), (-0.7483168971, 17.1314911064), (0, 15.9719991981))
            ThreePointArc((0, 15.9719991981), (0.7483168971, 17.1314911064), (1.4682500504, 18.3088168551))
        make_face()
        with BuildLine():
            ThreePointArc((-4.294817459, 30.1759000362), (-4.7023200855, 31.3967387773), (-5.0815771994, 32.6266451411))
            ThreePointArc((-5.0815771994, 32.6266451411), (-6.2405400398, 32.4249296069), (-7.3915821042, 32.1820588837))
            ThreePointArc((-7.3915821042, 32.1820588837), (-7.0377991533, 30.9590231559), (-6.6566978658, 29.7442225234))
            ThreePointArc((-6.6566978658, 29.7442225234), (-5.4800098856, 29.9833268944), (-4.294817459, 30.1759000362))
        make_face()
        with BuildLine():
            ThreePointArc((-15.9719991981, 0), (-17.1314911064, 0.7483168971), (-18.3088168551, 1.4682500504))
            ThreePointArc((-18.3088168551, 1.4682500504), (-19.5100699332, 0.7187762227), (-20.7299390728, 0))
            ThreePointArc((-20.7299390728, 0), (-19.5100699332, -0.7187762227), (-18.3088168551, -1.4682500504))
            ThreePointArc((-18.3088168551, -1.4682500504), (-17.1314911064, -0.7483168971), (-15.9719991981, 0))
        make_face()
        with BuildLine():
            ThreePointArc((1.4682500504, -18.3088168551), (0.7483168971, -17.1314911064), (0, -15.9719991981))
            ThreePointArc((0, -15.9719991981), (-0.7483168971, -17.1314911064), (-1.4682500504, -18.3088168551))
            ThreePointArc((-1.4682500504, -18.3088168551), (-0.7187762227, -19.5100699332), (0, -20.7299390728))
            ThreePointArc((0, -20.7299390728), (0.7187762227, -19.5100699332), (1.4682500504, -18.3088168551))
        make_face()
        with BuildLine():
            ThreePointArc((20.7299390728, 0), (19.5100699332, 0.7187762227), (18.3088168551, 1.4682500504))
            ThreePointArc((18.3088168551, 1.4682500504), (17.1314911064, 0.7483168971), (15.9719991981, 0))
            ThreePointArc((15.9719991981, 0), (17.1314911064, -0.7483168971), (18.3088168551, -1.4682500504))
            ThreePointArc((18.3088168551, -1.4682500504), (19.5100699332, -0.7187762227), (20.7299390728, 0))
        make_face()
    extrude(amount=F1_DEPTH)


with BuildPart() as f8:
    # F2 (on Top) → F8 (new body)
    with BuildSketch(Plane.XY):
        Polygon((127.7999281883, -84.1216519475), (127.7999281883, 84.1216519475), (-127.7999281883, 84.1216519475), (-127.7999281883, -84.1216519475), (-121.7135108794, -84.1216519475), (-121.7135108794, -80.1153939963), (-121.7135108794, 80.1153939963), (121.7135108794, 80.1153939963), (121.7135108794, -80.1153939963), (121.7135108794, -84.1216519475), align=None)
    extrude(amount=-F8_DEPTH)

    # F2 (on Top) → F5 (join)
    with BuildSketch(Plane.XY):
        with Locations((0, -82.1185229719)):
            Rectangle(F2_W, F2_H)
    extrude(amount=-F5_DEPTH)

    # F4 (on offset) → F9 (join)
    with BuildSketch(Plane.XY.offset(-76.2)):
        Rectangle(F4_W, F4_H)
    extrude(amount=-F9_DEPTH)

    # F7: fillet of radius 5.08 on 3 edges, made by hand

    # F7_s2 → F7_t1 (cut)
    with BuildSketch(Plane.XZ.offset(-96.8216519475)):
        with BuildLine():
            ThreePointArc((127.7999281883, -5.08), (126.3120306368, -1.4878975516), (122.7199281883, 0))
            Line((122.7199281883, 0), (127.7999281883, 0))
            Line((127.7999281883, 0), (127.7999281883, -5.08))
        make_face()
        with BuildLine():
            ThreePointArc((-122.7199281883, 0), (-126.3120306368, -1.4878975516), (-127.7999281883, -5.08))
            Line((-127.7999281883, -5.08), (-127.7999281883, 0))
            Line((-127.7999281883, 0), (-122.7199281883, 0))
        make_face()
    extrude(amount=F7_T1_DEPTH, mode=Mode.SUBTRACT)

    # F7_s4 → F7_t3 (cut)
    with BuildSketch(Plane.YZ.offset(-140.4999281883)):
        with BuildLine():
            ThreePointArc((84.1216519475, -5.08), (82.6337543959, -1.4878975516), (79.0416519475, 0))
            Line((79.0416519475, 0), (84.1216519475, 0))
            Line((84.1216519475, 0), (84.1216519475, -5.08))
        make_face()
    extrude(amount=F7_T3_DEPTH, mode=Mode.SUBTRACT)


with BuildPart() as f6:
    # F2 (on Top) → F6 (new body)
    with BuildSketch(Plane.XY):
        Rectangle(F2_W, F2_H_2)
    extrude(amount=-F6_DEPTH)


solid = Compound([f1.part, f8.part, f6.part])
